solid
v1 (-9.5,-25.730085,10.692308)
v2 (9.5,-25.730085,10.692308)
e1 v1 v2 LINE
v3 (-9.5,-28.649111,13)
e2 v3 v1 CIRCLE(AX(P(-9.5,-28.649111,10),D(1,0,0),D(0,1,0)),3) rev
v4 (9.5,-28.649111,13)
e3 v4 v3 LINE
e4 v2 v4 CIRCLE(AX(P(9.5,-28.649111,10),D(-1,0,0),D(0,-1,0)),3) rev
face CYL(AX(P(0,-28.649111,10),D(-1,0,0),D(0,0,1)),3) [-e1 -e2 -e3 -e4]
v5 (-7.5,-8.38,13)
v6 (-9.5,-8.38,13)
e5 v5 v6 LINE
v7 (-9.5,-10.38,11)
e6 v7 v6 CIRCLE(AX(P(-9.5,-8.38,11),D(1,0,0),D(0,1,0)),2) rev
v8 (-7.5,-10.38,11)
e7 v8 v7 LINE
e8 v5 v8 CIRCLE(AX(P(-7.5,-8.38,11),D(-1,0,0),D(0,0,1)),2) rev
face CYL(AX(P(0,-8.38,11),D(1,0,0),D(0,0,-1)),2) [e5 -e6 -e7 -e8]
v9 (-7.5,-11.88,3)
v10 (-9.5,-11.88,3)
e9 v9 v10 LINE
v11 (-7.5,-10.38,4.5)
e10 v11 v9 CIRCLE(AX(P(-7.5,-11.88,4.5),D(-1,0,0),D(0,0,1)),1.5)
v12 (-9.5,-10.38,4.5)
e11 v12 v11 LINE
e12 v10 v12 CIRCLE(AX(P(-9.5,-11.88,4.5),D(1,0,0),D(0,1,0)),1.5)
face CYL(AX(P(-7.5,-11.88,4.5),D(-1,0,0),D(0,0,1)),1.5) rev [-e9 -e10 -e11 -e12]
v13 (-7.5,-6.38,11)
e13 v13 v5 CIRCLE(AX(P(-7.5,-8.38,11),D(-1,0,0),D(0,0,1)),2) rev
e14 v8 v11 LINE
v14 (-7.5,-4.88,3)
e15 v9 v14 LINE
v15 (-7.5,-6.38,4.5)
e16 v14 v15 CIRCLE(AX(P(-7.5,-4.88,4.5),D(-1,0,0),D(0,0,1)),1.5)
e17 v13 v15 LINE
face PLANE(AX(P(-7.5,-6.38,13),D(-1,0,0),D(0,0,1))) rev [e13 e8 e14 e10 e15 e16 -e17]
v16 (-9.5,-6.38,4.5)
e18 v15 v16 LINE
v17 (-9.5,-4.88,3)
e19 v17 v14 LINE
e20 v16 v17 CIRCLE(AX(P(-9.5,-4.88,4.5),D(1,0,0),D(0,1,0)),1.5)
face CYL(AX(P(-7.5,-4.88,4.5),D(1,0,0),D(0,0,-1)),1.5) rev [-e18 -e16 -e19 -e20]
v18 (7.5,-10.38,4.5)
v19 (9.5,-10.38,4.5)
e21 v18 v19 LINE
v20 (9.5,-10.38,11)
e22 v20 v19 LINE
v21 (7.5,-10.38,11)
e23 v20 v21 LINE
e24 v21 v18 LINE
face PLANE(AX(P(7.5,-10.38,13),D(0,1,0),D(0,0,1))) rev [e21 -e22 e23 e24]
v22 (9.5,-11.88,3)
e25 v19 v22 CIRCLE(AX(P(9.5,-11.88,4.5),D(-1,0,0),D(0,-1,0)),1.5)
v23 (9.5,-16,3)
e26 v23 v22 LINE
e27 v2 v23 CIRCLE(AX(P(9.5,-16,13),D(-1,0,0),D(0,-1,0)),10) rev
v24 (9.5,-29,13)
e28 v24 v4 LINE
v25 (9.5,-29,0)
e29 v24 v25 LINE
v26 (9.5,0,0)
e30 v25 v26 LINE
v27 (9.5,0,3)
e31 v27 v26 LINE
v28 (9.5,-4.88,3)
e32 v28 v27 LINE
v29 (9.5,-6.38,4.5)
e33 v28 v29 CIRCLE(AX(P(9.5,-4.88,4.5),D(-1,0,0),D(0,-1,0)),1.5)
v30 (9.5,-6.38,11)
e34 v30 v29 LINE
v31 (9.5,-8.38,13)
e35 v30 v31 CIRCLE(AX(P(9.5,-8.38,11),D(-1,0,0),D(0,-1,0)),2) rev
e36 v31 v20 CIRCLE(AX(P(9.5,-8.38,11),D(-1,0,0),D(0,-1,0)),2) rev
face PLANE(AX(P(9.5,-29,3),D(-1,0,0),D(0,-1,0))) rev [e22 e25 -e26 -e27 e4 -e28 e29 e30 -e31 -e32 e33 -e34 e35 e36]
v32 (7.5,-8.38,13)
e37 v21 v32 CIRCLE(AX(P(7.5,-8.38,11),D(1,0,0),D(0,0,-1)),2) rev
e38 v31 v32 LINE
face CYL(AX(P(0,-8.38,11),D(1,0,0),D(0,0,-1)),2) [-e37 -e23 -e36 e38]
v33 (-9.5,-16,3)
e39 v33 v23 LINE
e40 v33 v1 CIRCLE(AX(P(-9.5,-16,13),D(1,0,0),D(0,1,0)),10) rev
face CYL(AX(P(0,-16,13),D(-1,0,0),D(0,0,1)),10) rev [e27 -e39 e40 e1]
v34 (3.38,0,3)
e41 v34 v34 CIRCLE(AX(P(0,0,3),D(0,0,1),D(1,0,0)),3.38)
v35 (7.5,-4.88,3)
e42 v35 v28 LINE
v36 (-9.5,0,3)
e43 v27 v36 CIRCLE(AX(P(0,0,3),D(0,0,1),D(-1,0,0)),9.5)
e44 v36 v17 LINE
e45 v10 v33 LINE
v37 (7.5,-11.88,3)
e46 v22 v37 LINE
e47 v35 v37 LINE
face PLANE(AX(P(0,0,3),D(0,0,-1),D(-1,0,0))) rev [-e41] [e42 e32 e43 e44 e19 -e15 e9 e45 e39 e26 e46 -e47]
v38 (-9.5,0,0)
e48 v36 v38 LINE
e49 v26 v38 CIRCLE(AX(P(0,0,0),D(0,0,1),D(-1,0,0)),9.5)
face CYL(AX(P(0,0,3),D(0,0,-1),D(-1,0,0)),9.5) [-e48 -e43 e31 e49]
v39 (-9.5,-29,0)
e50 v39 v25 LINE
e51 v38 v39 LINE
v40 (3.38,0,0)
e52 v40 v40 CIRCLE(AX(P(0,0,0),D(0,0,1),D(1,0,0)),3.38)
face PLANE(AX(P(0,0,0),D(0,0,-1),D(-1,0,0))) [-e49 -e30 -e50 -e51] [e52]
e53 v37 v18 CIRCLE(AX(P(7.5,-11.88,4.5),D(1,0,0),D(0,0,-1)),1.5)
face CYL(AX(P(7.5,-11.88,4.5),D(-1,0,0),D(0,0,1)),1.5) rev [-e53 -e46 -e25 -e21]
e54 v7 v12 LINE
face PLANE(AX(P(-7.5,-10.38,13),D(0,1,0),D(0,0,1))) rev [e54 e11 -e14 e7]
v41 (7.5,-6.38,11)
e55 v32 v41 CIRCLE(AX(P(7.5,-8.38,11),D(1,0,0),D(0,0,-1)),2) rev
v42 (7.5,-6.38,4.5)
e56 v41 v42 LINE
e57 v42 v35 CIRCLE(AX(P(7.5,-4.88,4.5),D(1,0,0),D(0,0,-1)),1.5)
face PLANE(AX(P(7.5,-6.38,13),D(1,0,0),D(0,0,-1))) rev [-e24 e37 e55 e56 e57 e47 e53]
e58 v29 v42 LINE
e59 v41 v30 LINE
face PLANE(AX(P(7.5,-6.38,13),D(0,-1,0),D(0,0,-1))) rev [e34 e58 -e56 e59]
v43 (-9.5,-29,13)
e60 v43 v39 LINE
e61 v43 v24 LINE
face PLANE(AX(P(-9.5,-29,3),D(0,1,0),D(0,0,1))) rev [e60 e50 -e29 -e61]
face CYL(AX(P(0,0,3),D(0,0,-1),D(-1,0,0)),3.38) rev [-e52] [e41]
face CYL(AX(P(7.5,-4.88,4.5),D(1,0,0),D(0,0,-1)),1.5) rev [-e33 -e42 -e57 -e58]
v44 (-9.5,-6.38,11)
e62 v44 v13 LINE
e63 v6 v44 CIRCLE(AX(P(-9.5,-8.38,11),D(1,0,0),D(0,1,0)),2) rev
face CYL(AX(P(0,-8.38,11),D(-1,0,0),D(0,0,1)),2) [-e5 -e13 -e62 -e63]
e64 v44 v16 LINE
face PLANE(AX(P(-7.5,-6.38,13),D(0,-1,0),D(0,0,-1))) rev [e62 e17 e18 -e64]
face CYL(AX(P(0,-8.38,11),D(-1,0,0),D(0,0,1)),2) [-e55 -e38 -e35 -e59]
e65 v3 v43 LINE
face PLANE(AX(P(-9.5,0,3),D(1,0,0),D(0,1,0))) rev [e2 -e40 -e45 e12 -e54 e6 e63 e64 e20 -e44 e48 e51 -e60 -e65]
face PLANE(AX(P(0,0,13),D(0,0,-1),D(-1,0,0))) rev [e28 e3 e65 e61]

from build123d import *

# Parameters (mm, degrees)
CROQUIS2_R              = 3.38
SALIENTE_EXTRUIR1_DEPTH = 3
CROQUIS4_W              = 19
CROQUIS4_H              = 3
SALIENTE_EXTRUIR2_DEPTH = 10
REDONDEO1_R             = 10
CROQUIS7_W              = 2
CROQUIS7_H              = 4
SALIENTE_EXTRUIR4_DEPTH = 10
REDONDEO4_R             = 1.5
REDONDEO5_R             = 2
REDONDEO6_R             = 3


# Some blends are built 0.0001 mm under size
with BuildPart() as part:
    # Croquis2 → Saliente-Extruir1 (new body)
    with BuildSketch(Plane.XY):
        with BuildLine():
            Line((-9.5, 0), (-9.5, -29))
            Line((-9.5, -29), (9.5, -29))
            Line((9.5, -29), (9.5, 0))
            ThreePointArc((9.5, 0), (0, 9.5), (-9.5, 0))
        make_face()
        Circle(CROQUIS2_R, mode=Mode.SUBTRACT)
    extrude(amount=SALIENTE_EXTRUIR1_DEPTH)

    # Croquis4 → Saliente-Extruir2 (add)
    with BuildSketch(Plane.XY.offset(3)):
        with Locations((0, -27.5)):
            Rectangle(CROQUIS4_W, CROQUIS4_H)
    extrude(amount=SALIENTE_EXTRUIR2_DEPTH)

    # Redondeo1
    redondeo1_edges = [part.edges().sort_by_distance(p)[0] for p in [
        (0, -26, 3),
    ]]
    fillet(redondeo1_edges, radius=REDONDEO1_R - 0.0001)  # a hair under: the kernel refuses the full size

    # Croquis7 → Saliente-Extruir4 (add)
    with BuildSketch(Plane.XY.offset(3)):
        with Locations((-8.5, -8.38)):
            Rectangle(CROQUIS7_W, CROQUIS7_H)
        with Locations((8.5, -8.38)):
            Rectangle(CROQUIS7_W, CROQUIS7_H)
    extrude(amount=SALIENTE_EXTRUIR4_DEPTH)

    # Redondeo4
    redondeo4_edges = [part.edges().sort_by_distance(p)[0] for p in [
        (-8.5, -6.38, 3),
        (-8.5, -10.38, 3),
        (8.5, -6.38, 3),
        (8.5, -10.38, 3),
    ]]
    fillet(redondeo4_edges, radius=REDONDEO4_R)

    # Redondeo5
    redondeo5_edges = [part.edges().sort_by_distance(p)[0] for p in [
        (8.5, -10.38, 13),
        (8.5, -6.38, 13),
        (-8.5, -10.38, 13),
        (-8.5, -6.38, 13),
    ]]
    fillet(redondeo5_edges, radius=REDONDEO5_R - 0.0001)  # a hair under: the kernel refuses the full size

    # Redondeo6
    # the kernel refuses this fillet: 3 mm, written as the material it takes off along each edge
    with BuildSketch(Plane(origin=(16.122828959, -26, 13), x_dir=(0, -1, 0), z_dir=(-1, 0, 0))) as redondeo6_piece_1:
        with BuildLine():
            CenterArc((2.649131583, -3), REDONDEO6_R, 90, 76.657984638)
            Line((-0.269898159, -2.307710059), (-0.561801133, -2.238481065))
            ThreePointArc((-0.561801133, -2.238481065), (-0.3, -0.0001), (-0.3, 0))
            Line((-0.3, 0), (0, 0.3))
            Line((0, 0.3), (2.649131583, 0.3))
            Line((2.649131583, 0.3), (2.649131583, 0))
        make_face()
    extrude(amount=32.245657917, mode=Mode.SUBTRACT)


solid = part.part
